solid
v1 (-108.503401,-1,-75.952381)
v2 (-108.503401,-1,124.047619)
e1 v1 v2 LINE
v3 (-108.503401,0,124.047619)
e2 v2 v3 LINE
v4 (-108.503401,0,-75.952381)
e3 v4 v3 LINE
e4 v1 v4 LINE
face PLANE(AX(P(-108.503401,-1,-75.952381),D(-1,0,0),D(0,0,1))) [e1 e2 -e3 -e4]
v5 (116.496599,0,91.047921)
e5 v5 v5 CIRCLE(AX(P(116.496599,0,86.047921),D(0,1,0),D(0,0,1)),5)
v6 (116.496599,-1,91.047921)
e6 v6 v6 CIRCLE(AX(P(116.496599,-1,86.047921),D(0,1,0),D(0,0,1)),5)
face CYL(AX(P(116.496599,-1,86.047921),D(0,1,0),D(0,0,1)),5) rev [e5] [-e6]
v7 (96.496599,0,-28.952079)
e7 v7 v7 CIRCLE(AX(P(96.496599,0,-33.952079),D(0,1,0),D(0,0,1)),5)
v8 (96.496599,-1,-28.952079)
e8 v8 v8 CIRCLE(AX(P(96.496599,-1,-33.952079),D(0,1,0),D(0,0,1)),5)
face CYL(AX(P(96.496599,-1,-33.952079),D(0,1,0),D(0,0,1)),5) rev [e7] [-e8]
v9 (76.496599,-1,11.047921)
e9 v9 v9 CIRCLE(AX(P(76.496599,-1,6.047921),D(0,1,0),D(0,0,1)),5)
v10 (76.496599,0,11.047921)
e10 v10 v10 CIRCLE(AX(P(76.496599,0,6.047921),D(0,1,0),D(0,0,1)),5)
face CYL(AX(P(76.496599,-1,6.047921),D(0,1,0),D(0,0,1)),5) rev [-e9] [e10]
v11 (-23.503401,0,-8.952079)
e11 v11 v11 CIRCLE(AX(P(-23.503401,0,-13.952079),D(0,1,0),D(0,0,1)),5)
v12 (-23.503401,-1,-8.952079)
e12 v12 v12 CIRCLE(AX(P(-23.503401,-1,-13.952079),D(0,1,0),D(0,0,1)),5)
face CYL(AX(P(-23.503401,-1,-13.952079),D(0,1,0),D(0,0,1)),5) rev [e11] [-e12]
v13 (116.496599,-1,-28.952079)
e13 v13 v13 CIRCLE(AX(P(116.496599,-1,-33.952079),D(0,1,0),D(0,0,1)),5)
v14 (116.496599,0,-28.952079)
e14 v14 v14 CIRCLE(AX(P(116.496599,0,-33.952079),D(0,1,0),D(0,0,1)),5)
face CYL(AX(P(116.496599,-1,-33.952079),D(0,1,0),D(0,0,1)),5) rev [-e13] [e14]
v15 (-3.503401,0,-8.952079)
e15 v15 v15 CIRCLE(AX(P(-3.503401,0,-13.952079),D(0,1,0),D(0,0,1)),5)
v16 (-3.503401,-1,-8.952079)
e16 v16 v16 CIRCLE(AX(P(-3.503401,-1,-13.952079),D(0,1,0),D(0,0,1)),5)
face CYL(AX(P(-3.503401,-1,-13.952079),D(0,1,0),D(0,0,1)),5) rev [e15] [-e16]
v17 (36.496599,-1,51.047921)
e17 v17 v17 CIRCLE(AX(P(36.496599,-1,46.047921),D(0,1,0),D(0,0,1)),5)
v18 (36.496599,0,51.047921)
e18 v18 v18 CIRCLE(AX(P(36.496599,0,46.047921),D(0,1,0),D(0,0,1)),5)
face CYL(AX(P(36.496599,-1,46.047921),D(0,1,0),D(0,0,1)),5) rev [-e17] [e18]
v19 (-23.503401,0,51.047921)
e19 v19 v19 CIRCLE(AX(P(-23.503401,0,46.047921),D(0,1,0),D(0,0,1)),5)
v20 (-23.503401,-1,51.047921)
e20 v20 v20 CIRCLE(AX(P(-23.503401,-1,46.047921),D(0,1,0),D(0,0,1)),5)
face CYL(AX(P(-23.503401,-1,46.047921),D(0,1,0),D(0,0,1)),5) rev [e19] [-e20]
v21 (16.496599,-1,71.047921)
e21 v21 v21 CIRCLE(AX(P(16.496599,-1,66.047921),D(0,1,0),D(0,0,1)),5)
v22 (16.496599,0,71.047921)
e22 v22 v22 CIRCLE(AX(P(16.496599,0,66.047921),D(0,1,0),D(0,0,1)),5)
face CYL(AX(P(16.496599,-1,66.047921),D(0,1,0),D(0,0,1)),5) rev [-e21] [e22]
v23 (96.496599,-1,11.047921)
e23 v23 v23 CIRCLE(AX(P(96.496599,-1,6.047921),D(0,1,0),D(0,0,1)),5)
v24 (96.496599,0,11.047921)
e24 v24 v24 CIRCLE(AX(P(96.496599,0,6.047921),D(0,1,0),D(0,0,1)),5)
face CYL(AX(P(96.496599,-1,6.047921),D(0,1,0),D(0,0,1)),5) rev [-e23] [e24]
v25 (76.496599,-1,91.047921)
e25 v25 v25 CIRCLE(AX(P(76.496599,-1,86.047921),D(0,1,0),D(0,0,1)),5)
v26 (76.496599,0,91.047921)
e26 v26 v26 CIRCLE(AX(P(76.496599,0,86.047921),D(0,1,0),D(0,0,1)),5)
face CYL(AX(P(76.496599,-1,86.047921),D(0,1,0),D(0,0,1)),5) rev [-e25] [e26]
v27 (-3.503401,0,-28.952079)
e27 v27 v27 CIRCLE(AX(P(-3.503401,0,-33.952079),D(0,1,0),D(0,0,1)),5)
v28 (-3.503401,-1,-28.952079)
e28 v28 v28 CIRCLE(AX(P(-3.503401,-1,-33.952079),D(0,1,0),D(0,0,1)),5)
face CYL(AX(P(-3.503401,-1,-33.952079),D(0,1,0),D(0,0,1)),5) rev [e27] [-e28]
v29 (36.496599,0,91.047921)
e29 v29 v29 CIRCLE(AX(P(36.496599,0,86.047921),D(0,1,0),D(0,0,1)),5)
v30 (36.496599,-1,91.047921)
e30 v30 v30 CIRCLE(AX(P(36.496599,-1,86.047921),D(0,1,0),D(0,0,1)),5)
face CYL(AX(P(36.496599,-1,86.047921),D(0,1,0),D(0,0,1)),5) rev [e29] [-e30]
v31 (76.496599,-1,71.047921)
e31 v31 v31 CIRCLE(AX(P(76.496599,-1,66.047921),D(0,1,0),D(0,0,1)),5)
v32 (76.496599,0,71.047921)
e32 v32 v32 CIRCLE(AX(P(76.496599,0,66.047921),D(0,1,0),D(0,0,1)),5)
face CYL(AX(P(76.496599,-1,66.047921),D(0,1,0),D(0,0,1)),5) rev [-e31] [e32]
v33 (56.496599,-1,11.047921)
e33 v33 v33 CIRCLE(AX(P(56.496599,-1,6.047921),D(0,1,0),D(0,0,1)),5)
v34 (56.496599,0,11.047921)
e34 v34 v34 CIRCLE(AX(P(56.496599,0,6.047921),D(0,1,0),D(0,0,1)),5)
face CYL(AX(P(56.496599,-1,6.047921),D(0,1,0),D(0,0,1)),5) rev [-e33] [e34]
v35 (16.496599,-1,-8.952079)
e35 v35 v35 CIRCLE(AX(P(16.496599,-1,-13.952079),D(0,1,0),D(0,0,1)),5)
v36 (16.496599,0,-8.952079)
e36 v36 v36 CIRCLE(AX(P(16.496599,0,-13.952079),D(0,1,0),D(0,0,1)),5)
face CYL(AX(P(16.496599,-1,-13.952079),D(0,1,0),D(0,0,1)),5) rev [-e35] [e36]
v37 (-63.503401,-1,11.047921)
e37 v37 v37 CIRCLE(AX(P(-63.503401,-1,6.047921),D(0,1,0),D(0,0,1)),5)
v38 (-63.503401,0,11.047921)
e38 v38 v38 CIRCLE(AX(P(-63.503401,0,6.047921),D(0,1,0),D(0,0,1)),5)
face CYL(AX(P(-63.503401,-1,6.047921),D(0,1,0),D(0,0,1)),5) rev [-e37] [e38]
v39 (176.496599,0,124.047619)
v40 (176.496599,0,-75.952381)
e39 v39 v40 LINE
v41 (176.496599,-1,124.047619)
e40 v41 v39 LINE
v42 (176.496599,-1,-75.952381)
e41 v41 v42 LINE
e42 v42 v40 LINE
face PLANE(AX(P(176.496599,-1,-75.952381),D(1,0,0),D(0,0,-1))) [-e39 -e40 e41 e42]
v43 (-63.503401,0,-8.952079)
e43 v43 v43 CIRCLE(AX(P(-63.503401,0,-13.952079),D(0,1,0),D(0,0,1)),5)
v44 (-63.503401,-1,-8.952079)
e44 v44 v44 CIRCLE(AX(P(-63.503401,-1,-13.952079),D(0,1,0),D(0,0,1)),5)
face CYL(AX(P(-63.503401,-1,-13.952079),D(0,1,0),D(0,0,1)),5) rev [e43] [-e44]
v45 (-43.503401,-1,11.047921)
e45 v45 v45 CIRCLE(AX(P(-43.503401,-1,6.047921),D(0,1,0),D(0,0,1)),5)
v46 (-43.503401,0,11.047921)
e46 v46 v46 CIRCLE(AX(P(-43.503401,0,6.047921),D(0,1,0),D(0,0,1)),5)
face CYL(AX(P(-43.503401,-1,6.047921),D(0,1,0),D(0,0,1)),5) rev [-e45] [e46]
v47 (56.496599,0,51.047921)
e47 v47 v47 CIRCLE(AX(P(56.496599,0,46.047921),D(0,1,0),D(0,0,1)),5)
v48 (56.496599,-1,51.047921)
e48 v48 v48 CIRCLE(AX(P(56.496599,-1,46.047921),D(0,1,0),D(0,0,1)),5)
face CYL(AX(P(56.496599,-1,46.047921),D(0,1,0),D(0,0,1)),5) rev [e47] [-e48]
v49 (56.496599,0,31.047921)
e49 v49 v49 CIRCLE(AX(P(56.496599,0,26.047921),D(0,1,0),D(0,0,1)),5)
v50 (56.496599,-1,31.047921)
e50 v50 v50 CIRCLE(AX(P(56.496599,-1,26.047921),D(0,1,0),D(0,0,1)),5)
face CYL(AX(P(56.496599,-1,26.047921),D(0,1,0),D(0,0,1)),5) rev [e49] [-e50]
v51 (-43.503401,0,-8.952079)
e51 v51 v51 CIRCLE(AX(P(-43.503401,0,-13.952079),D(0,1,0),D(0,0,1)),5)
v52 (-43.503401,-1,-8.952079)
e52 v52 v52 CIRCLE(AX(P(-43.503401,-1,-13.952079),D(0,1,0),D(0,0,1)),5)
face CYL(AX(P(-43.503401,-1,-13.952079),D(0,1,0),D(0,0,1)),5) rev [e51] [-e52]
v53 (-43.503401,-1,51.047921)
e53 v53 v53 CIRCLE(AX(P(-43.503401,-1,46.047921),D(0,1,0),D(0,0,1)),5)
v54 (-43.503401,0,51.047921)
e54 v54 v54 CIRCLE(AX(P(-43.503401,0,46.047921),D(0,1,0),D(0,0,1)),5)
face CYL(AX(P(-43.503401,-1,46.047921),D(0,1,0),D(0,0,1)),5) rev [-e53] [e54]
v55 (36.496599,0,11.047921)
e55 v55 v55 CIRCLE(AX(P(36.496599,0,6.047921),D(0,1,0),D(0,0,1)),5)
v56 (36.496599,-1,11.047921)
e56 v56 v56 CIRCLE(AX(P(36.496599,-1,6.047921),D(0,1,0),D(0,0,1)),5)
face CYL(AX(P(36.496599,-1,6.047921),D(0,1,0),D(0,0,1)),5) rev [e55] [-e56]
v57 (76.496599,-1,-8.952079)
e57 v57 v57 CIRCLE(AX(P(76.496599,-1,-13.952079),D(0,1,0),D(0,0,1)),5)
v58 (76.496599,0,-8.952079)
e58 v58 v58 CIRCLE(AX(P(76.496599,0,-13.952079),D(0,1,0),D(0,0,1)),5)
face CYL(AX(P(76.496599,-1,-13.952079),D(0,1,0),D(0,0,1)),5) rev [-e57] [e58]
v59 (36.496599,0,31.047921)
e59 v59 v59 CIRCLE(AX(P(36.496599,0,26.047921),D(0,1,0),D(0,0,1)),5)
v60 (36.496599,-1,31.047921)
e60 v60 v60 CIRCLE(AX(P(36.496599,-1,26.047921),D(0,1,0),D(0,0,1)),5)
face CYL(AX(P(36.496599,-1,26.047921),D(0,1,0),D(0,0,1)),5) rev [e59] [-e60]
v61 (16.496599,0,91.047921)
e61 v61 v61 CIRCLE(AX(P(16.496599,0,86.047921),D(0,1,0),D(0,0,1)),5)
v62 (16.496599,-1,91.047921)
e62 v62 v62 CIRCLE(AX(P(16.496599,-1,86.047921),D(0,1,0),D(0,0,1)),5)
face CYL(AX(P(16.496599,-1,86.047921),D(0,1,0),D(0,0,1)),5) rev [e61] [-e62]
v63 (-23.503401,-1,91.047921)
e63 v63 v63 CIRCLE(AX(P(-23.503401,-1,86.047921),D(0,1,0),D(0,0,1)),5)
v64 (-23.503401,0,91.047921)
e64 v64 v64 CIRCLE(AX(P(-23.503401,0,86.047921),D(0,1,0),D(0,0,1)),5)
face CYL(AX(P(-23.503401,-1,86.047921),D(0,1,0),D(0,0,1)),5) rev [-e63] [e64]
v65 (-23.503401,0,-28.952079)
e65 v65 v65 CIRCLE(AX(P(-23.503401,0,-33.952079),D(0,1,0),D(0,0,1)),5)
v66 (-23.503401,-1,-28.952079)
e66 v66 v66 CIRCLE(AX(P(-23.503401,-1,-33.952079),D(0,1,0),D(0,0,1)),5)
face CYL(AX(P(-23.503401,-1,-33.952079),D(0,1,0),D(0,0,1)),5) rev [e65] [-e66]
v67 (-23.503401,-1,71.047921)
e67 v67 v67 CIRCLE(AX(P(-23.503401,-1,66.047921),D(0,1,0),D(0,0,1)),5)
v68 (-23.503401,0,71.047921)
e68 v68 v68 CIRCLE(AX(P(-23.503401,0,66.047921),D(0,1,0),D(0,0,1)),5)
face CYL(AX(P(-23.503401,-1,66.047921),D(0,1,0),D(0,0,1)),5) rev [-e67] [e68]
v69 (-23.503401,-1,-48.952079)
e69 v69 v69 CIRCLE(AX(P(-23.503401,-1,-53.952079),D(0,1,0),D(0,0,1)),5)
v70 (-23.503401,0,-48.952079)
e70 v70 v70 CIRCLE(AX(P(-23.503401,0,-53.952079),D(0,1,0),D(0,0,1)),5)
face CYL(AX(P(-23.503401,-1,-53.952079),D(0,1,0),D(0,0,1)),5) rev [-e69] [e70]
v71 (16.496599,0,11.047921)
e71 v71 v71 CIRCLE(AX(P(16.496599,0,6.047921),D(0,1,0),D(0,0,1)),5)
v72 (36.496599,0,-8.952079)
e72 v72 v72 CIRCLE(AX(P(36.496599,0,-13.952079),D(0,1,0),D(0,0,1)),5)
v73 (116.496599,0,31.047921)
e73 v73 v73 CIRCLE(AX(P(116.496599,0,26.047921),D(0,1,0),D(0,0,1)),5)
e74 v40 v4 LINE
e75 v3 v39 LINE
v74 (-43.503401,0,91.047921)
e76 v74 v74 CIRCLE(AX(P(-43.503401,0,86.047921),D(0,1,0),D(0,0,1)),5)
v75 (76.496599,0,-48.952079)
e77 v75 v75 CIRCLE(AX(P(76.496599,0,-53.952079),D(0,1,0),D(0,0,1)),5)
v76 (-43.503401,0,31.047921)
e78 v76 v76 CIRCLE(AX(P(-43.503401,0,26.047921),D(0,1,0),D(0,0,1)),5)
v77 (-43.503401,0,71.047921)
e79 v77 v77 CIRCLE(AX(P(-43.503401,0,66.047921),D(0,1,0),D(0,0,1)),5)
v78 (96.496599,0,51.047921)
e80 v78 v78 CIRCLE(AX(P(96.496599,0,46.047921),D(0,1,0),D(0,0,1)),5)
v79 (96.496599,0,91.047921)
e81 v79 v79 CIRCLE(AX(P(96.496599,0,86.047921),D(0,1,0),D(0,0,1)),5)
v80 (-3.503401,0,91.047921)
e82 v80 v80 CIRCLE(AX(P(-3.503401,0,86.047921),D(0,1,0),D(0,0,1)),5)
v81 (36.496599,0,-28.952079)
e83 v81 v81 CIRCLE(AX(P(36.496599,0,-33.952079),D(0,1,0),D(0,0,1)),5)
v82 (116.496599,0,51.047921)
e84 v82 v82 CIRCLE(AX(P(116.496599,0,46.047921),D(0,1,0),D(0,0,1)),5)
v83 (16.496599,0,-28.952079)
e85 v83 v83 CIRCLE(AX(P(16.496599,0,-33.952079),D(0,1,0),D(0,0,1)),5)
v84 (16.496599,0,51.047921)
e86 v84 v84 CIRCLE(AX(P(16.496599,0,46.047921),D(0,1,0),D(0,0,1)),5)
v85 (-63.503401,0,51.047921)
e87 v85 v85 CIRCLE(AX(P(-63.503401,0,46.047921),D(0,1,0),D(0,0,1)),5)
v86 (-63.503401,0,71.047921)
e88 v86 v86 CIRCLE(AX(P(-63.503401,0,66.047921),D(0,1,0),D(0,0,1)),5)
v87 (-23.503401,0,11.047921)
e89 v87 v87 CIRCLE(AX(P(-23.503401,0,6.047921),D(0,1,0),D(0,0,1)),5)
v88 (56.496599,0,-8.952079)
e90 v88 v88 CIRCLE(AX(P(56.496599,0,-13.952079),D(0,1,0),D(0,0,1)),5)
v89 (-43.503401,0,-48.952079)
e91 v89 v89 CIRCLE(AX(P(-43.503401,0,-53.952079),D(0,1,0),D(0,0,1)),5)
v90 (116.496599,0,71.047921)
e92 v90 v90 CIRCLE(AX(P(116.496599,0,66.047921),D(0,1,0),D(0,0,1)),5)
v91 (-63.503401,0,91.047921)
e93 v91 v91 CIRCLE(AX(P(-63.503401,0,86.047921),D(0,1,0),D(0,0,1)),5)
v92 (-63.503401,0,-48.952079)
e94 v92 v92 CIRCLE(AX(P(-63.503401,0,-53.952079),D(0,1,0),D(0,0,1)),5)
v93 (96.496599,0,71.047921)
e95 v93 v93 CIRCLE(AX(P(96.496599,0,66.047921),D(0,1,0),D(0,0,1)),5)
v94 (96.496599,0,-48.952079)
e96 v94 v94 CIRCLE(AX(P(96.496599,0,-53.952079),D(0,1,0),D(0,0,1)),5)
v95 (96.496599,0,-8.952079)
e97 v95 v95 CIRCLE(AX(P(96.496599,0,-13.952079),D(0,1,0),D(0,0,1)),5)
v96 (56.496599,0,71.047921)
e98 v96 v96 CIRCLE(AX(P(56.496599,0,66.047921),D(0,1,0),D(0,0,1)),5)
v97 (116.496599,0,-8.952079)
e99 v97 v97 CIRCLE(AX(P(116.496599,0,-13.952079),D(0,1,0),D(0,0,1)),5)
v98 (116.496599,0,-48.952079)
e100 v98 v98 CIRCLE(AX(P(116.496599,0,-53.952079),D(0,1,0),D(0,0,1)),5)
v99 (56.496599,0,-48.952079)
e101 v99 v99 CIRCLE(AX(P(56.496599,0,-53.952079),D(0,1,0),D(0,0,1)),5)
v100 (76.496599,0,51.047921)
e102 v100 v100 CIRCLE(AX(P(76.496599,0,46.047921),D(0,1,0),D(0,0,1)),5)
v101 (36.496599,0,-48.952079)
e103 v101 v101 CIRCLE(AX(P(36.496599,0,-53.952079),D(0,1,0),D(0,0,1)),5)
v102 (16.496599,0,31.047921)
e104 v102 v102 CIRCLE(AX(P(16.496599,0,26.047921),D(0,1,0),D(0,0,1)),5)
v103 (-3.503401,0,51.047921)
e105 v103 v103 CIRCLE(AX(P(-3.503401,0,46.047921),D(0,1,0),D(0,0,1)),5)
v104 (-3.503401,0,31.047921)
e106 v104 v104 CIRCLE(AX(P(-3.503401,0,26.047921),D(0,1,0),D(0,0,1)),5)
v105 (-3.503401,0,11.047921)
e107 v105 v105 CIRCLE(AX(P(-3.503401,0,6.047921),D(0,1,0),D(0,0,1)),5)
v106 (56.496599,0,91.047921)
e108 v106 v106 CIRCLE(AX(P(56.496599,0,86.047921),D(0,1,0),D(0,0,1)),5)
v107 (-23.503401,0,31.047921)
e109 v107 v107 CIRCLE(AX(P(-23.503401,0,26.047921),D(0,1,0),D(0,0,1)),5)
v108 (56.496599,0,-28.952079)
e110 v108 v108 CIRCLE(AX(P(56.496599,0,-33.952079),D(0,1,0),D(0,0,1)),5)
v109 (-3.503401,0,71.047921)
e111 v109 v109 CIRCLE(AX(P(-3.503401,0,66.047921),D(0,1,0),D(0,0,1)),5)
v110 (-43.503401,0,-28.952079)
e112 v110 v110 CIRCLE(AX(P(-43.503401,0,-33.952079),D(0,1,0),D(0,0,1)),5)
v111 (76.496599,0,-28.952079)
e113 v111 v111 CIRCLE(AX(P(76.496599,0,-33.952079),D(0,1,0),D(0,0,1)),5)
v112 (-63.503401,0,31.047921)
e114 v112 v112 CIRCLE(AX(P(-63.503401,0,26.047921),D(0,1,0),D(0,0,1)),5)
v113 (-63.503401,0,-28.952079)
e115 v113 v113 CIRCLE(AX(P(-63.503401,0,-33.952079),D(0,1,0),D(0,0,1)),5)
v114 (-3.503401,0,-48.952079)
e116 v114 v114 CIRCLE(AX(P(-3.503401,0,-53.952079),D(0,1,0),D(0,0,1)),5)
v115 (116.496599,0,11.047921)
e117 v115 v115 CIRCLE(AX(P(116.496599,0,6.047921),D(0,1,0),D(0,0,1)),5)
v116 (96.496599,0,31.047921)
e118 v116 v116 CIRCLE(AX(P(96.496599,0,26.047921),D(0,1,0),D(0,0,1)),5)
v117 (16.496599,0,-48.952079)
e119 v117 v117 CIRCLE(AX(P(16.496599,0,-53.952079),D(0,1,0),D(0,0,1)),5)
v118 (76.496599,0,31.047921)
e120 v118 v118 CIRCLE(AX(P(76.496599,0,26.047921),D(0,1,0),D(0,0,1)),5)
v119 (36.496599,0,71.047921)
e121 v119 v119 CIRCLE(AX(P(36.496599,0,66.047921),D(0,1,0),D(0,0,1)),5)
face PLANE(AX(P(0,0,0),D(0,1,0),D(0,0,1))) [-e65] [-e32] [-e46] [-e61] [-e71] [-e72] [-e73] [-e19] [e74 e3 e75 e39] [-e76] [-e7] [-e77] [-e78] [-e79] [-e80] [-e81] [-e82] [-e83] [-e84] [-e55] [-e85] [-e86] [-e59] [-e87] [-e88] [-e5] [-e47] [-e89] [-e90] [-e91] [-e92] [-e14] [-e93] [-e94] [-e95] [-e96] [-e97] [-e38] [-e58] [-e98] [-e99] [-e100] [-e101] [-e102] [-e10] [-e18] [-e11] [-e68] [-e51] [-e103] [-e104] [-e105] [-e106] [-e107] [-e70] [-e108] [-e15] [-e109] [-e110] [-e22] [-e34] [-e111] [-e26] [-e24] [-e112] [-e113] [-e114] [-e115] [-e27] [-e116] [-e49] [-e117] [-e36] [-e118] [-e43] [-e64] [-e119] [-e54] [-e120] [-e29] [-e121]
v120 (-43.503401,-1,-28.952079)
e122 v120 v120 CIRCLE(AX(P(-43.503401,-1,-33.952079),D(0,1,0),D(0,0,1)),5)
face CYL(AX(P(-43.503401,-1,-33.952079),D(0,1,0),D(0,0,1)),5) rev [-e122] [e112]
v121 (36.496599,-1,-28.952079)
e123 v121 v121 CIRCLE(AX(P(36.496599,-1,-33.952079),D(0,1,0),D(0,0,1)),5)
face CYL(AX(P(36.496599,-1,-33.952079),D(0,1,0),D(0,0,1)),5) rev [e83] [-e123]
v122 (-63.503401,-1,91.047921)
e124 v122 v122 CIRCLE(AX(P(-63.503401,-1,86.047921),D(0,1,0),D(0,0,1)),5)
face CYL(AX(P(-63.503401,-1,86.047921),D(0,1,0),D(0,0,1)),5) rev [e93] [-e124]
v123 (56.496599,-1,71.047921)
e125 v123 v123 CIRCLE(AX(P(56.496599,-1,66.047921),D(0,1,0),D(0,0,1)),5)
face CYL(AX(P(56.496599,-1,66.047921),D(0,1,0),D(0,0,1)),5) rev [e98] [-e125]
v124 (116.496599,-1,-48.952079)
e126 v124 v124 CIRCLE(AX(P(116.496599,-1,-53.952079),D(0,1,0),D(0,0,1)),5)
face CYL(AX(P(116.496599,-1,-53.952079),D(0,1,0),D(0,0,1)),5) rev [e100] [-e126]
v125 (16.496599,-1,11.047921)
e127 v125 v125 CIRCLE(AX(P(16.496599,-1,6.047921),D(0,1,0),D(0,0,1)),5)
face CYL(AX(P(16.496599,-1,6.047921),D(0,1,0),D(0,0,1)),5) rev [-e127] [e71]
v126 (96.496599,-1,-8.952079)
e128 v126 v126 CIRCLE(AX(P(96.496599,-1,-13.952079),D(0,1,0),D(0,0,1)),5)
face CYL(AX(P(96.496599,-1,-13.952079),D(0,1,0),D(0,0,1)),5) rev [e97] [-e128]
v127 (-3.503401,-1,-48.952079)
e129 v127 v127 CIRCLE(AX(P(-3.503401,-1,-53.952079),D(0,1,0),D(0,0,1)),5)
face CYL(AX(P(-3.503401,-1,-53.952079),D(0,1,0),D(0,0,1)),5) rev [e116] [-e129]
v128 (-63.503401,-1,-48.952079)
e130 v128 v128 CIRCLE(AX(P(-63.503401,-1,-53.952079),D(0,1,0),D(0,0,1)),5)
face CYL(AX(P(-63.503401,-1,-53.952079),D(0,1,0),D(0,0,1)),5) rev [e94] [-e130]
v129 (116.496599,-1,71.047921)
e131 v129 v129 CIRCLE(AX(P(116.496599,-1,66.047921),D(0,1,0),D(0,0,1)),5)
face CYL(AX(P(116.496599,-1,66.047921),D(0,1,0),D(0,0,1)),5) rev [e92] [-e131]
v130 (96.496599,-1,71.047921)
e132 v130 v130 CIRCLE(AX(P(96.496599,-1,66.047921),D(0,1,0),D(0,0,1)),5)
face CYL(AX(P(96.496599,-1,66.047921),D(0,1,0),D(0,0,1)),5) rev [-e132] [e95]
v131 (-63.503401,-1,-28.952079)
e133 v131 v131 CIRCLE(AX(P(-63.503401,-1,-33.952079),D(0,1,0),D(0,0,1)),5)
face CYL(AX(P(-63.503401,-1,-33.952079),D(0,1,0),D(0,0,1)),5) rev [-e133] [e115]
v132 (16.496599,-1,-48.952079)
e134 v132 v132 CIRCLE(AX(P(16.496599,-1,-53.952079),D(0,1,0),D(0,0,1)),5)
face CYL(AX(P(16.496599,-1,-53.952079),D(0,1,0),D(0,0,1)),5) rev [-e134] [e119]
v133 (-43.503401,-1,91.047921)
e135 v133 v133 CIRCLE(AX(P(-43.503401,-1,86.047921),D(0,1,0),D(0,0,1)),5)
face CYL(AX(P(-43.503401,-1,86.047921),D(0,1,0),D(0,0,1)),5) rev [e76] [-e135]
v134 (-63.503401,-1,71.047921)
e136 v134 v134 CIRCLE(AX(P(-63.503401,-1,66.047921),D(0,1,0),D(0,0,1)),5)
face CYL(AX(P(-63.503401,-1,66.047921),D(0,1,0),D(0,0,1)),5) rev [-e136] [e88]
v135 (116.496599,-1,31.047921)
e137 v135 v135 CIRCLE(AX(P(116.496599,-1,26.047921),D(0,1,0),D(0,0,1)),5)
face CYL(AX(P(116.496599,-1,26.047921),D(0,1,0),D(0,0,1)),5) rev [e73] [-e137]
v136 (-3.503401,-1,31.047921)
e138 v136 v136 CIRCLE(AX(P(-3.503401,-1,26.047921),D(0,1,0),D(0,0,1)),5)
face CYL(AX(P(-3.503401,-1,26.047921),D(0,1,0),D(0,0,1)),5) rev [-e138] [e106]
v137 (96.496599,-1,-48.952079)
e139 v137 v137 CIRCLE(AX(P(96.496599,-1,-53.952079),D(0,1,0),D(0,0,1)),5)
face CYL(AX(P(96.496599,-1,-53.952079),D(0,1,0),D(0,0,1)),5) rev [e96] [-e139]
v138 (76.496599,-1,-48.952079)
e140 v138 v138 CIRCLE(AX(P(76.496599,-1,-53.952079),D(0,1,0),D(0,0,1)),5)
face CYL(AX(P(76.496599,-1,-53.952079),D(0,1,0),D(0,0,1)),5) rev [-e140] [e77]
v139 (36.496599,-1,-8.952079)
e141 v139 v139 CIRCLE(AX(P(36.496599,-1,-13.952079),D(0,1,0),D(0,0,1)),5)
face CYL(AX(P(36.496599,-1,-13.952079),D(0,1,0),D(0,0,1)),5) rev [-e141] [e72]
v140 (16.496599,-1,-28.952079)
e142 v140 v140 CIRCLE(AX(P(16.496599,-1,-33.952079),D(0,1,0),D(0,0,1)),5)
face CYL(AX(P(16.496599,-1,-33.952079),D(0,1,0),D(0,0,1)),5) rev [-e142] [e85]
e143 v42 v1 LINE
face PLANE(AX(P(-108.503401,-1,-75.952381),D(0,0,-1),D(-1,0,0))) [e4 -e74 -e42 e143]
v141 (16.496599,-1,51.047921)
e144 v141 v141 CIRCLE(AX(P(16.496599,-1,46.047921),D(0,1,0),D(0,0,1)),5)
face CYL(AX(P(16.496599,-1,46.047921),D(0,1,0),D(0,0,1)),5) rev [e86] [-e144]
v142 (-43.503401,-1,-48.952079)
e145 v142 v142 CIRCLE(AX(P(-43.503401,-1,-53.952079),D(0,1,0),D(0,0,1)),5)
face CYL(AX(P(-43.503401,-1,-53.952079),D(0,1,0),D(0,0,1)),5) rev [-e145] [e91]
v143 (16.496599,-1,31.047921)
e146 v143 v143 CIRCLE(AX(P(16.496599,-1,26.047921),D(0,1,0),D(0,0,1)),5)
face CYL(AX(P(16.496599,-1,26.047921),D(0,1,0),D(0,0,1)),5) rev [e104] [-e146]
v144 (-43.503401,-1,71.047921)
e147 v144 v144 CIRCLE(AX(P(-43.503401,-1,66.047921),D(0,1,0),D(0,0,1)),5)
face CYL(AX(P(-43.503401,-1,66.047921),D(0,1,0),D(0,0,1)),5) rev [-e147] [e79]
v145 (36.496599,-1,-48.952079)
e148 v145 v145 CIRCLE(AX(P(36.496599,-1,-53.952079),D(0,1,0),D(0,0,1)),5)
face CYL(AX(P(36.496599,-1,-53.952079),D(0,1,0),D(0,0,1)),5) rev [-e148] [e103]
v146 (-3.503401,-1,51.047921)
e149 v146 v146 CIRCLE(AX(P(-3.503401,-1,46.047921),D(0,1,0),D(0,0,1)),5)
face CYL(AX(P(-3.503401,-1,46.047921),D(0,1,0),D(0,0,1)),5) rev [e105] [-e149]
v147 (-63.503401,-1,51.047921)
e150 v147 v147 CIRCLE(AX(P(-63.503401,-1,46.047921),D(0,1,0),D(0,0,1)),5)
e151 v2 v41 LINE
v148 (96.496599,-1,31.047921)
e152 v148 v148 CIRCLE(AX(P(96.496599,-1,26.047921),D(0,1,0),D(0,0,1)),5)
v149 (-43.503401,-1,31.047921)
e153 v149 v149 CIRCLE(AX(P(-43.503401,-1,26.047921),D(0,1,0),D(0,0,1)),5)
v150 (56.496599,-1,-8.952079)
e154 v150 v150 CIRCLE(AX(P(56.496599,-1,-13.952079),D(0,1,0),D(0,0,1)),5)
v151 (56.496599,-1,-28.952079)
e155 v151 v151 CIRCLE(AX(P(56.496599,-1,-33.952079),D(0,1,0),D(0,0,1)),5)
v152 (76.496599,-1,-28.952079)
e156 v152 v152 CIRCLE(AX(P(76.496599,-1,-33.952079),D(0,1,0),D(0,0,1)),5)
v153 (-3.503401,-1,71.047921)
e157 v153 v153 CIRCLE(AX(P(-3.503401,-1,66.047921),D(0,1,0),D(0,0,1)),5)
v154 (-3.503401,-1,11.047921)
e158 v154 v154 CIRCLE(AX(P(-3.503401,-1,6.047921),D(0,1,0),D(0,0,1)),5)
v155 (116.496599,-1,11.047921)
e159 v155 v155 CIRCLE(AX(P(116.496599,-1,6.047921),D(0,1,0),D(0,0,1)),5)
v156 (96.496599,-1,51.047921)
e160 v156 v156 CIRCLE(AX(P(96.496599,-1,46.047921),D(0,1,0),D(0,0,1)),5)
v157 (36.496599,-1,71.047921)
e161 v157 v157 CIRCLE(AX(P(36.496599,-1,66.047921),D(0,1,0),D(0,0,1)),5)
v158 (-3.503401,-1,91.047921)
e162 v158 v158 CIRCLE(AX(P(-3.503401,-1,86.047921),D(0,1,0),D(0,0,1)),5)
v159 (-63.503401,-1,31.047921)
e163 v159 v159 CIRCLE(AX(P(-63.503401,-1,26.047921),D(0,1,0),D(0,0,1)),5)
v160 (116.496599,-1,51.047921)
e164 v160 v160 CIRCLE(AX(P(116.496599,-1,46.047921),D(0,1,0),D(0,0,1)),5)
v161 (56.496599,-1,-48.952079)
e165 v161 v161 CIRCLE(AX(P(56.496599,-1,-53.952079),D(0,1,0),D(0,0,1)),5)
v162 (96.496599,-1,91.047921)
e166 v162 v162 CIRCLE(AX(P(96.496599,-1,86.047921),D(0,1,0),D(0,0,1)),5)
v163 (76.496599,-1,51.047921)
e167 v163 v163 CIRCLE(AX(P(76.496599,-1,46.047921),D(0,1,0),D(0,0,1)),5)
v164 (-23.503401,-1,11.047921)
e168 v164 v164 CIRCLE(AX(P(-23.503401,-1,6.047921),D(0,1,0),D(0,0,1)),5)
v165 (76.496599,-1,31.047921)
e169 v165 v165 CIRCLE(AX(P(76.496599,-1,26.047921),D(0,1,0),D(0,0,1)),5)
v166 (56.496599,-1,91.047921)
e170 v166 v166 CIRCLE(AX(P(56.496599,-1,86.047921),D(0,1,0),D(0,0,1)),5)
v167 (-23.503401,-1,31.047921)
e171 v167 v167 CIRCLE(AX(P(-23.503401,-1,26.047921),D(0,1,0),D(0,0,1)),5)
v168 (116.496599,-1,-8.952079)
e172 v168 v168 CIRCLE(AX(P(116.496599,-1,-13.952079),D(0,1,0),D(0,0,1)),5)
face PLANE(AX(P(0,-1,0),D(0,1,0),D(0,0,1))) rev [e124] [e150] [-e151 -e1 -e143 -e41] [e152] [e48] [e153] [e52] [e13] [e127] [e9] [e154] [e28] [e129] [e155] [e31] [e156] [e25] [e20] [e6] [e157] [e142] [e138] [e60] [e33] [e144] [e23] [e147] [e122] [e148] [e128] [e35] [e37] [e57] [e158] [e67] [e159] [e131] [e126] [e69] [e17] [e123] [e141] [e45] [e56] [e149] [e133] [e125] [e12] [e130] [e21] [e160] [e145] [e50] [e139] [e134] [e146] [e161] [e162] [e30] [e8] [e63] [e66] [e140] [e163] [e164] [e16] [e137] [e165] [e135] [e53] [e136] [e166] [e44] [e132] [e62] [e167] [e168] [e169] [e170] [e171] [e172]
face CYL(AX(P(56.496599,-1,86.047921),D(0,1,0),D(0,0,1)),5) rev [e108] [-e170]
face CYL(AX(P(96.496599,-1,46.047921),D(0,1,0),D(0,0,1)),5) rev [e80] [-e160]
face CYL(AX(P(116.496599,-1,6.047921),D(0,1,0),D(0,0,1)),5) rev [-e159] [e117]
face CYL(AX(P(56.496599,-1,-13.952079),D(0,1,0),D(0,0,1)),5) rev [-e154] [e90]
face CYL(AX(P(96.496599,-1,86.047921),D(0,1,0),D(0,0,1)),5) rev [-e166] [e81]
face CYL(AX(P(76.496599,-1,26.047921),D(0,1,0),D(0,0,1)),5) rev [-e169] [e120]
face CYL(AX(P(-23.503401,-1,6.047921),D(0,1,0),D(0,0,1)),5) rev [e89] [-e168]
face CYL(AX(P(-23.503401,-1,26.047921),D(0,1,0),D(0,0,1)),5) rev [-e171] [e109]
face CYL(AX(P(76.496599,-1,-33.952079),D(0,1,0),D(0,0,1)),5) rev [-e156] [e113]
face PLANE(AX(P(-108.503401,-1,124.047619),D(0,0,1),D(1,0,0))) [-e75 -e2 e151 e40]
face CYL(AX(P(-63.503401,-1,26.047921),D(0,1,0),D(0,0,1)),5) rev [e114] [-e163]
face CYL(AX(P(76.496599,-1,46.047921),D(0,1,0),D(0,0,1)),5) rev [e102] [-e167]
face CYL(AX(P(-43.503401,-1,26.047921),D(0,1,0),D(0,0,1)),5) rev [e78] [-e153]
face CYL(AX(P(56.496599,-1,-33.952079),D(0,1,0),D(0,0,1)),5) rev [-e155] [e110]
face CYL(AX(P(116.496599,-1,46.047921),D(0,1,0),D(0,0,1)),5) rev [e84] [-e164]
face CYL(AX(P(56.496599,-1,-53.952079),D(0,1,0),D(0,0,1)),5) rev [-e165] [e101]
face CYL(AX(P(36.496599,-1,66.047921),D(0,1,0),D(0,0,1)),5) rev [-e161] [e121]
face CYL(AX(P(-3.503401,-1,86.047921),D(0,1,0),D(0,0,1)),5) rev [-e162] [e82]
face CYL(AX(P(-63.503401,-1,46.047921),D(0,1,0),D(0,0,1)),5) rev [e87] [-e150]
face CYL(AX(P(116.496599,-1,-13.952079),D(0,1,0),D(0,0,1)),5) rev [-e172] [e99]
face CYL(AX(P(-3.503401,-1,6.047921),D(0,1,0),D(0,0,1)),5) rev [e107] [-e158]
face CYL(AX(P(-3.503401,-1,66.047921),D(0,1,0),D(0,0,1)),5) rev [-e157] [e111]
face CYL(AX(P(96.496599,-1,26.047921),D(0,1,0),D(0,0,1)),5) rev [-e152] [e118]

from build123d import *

# Parameters (mm, degrees)
SKETCH1_W          = 285
SKETCH1_H          = 200
BASE_FLANGE1_DEPTH = 1
SKETCH2_R          = 5
CUT_EXTRUDE1_DEPTH = 216.730992495


# Sheet-metal steps are written as plain solids
with BuildPart() as part:
    # Sketch1 → Base-Flange1 (new body)
    with BuildSketch(Plane(origin=(0, 0, 0), x_dir=(1, 0, 0), z_dir=(0, 1, 0))):
        with Locations((33.996598639, -24.047619048)):
            Rectangle(SKETCH1_W, SKETCH1_H)
    extrude(amount=-BASE_FLANGE1_DEPTH)

    # Sketch2 → Cut-Extrude1 (cut, through all)
    with BuildSketch(Plane(origin=(0, 0, 0), x_dir=(1, 0, 0), z_dir=(0, 1, 0))):
        with Locations(Location((-63.503401361, 53.952079096, 0), (0, 0, 270))):
            Circle(SKETCH2_R)
        with Locations(Location((-63.503401361, 33.952079096, 0), (0, 0, 270))):
            Circle(SKETCH2_R)
        with Locations(Location((-63.503401361, 13.952079096, 0), (0, 0, 270))):
            Circle(SKETCH2_R)
        with Locations(Location((-63.503401361, -6.047920904, 0), (0, 0, 270))):
            Circle(SKETCH2_R)
        with Locations(Location((-63.503401361, -26.047920904, 0), (0, 0, 270))):
            Circle(SKETCH2_R)
        with Locations(Location((-63.503401361, -46.047920904, 0), (0, 0, 270))):
            Circle(SKETCH2_R)
        with Locations(Location((-63.503401361, -66.047920904, 0), (0, 0, 270))):
            Circle(SKETCH2_R)
        with Locations(Location((-63.503401361, -86.047920904, 0), (0, 0, 270))):
            Circle(SKETCH2_R)
        with Locations(Location((-43.503401361, 53.952079096, 0), (0, 0, 270))):
            Circle(SKETCH2_R)
        with Locations(Location((-43.503401361, 33.952079096, 0), (0, 0, 270))):
            Circle(SKETCH2_R)
        with Locations(Location((-43.503401361, 13.952079096, 0), (0, 0, 270))):
            Circle(SKETCH2_R)
        with Locations(Location((-43.503401361, -6.047920904, 0), (0, 0, 270))):
            Circle(SKETCH2_R)
        with Locations(Location((-43.503401361, -26.047920904, 0), (0, 0, 270))):
            Circle(SKETCH2_R)
        with Locations(Location((-43.503401361, -46.047920904, 0), (0, 0, 270))):
            Circle(SKETCH2_R)
        with Locations(Location((-43.503401361, -66.047920904, 0), (0, 0, 270))):
            Circle(SKETCH2_R)
        with Locations(Location((-43.503401361, -86.047920904, 0), (0, 0, 270))):
            Circle(SKETCH2_R)
        with Locations(Location((-23.503401361, 53.952079096, 0), (0, 0, 270))):
            Circle(SKETCH2_R)
        with Locations(Location((-23.503401361, 33.952079096, 0), (0, 0, 270))):
            Circle(SKETCH2_R)
        with Locations(Location((-23.503401361, 13.952079096, 0), (0, 0, 270))):
            Circle(SKETCH2_R)
        with Locations(Location((-23.503401361, -6.047920904, 0), (0, 0, 270))):
            Circle(SKETCH2_R)
        with Locations(Location((-23.503401361, -26.047920904, 0), (0, 0, 270))):
            Circle(SKETCH2_R)
        with Locations(Location((-23.503401361, -46.047920904, 0), (0, 0, 270))):
            Circle(SKETCH2_R)
        with Locations(Location((-23.503401361, -66.047920904, 0), (0, 0, 270))):
            Circle(SKETCH2_R)
        with Locations(Location((-23.503401361, -86.047920904, 0), (0, 0, 270))):
            Circle(SKETCH2_R)
        with Locations(Location((-3.503401361, 53.952079096, 0), (0, 0, 270))):
            Circle(SKETCH2_R)
        with Locations(Location((-3.503401361, 33.952079096, 0), (0, 0, 270))):
            Circle(SKETCH2_R)
        with Locations(Location((-3.503401361, 13.952079096, 0), (0, 0, 270))):
            Circle(SKETCH2_R)
        with Locations(Location((-3.503401361, -6.047920904, 0), (0, 0, 270))):
            Circle(SKETCH2_R)
        with Locations(Location((-3.503401361, -26.047920904, 0), (0, 0, 270))):
            Circle(SKETCH2_R)
        with Locations(Location((-3.503401361, -46.047920904, 0), (0, 0, 270))):
            Circle(SKETCH2_R)
        with Locations(Location((-3.503401361, -66.047920904, 0), (0, 0, 270))):
            Circle(SKETCH2_R)
        with Locations(Location((-3.503401361, -86.047920904, 0), (0, 0, 270))):
            Circle(SKETCH2_R)
        with Locations(Location((16.496598639, 53.952079096, 0), (0, 0, 270))):
            Circle(SKETCH2_R)
        with Locations(Location((16.496598639, 33.952079096, 0), (0, 0, 270))):
            Circle(SKETCH2_R)
        with Locations(Location((16.496598639, 13.952079096, 0), (0, 0, 270))):
            Circle(SKETCH2_R)
        with Locations(Location((16.496598639, -6.047920904, 0), (0, 0, 270))):
            Circle(SKETCH2_R)
        with Locations(Location((16.496598639, -26.047920904, 0), (0, 0, 270))):
            Circle(SKETCH2_R)
        with Locations(Location((16.496598639, -46.047920904, 0), (0, 0, 270))):
            Circle(SKETCH2_R)
        with Locations(Location((16.496598639, -66.047920904, 0), (0, 0, 270))):
            Circle(SKETCH2_R)
        with Locations(Location((16.496598639, -86.047920904, 0), (0, 0, 270))):
            Circle(SKETCH2_R)
        with Locations(Location((36.496598639, 53.952079096, 0), (0, 0, 270))):
            Circle(SKETCH2_R)
        with Locations(Location((36.496598639, 33.952079096, 0), (0, 0, 270))):
            Circle(SKETCH2_R)
        with Locations(Location((36.496598639, 13.952079096, 0), (0, 0, 270))):
            Circle(SKETCH2_R)
        with Locations(Location((36.496598639, -6.047920904, 0), (0, 0, 270))):
            Circle(SKETCH2_R)
        with Locations(Location((36.496598639, -26.047920904, 0), (0, 0, 270))):
            Circle(SKETCH2_R)
        with Locations(Location((36.496598639, -46.047920904, 0), (0, 0, 270))):
            Circle(SKETCH2_R)
        with Locations(Location((36.496598639, -66.047920904, 0), (0, 0, 270))):
            Circle(SKETCH2_R)
        with Locations(Location((36.496598639, -86.047920904, 0), (0, 0, 270))):
            Circle(SKETCH2_R)
        with Locations(Location((56.496598639, 53.952079096, 0), (0, 0, 270))):
            Circle(SKETCH2_R)
        with Locations(Location((56.496598639, 33.952079096, 0), (0, 0, 270))):
            Circle(SKETCH2_R)
        with Locations(Location((56.496598639, 13.952079096, 0), (0, 0, 270))):
            Circle(SKETCH2_R)
        with Locations(Location((56.496598639, -6.047920904, 0), (0, 0, 270))):
            Circle(SKETCH2_R)
        with Locations(Location((56.496598639, -26.047920904, 0), (0, 0, 270))):
            Circle(SKETCH2_R)
        with Locations(Location((56.496598639, -46.047920904, 0), (0, 0, 270))):
            Circle(SKETCH2_R)
        with Locations(Location((56.496598639, -66.047920904, 0), (0, 0, 270))):
            Circle(SKETCH2_R)
        with Locations(Location((56.496598639, -86.047920904, 0), (0, 0, 270))):
            Circle(SKETCH2_R)
        with Locations(Location((76.496598639, 53.952079096, 0), (0, 0, 270))):
            Circle(SKETCH2_R)
        with Locations(Location((76.496598639, 33.952079096, 0), (0, 0, 270))):
            Circle(SKETCH2_R)
        with Locations(Location((76.496598639, 13.952079096, 0), (0, 0, 270))):
            Circle(SKETCH2_R)
        with Locations(Location((76.496598639, -6.047920904, 0), (0, 0, 270))):
            Circle(SKETCH2_R)
        with Locations(Location((76.496598639, -26.047920904, 0), (0, 0, 270))):
            Circle(SKETCH2_R)
        with Locations(Location((76.496598639, -46.047920904, 0), (0, 0, 270))):
            Circle(SKETCH2_R)
        with Locations(Location((76.496598639, -66.047920904, 0), (0, 0, 270))):
            Circle(SKETCH2_R)
        with Locations(Location((76.496598639, -86.047920904, 0), (0, 0, 270))):
            Circle(SKETCH2_R)
        with Locations(Location((96.496598639, 53.952079096, 0), (0, 0, 270))):
            Circle(SKETCH2_R)
        with Locations(Location((96.496598639, 33.952079096, 0), (0, 0, 270))):
            Circle(SKETCH2_R)
        with Locations(Location((96.496598639, 13.952079096, 0), (0, 0, 270))):
            Circle(SKETCH2_R)
        with Locations(Location((96.496598639, -6.047920904, 0), (0, 0, 270))):
            Circle(SKETCH2_R)
        with Locations(Location((96.496598639, -26.047920904, 0), (0, 0, 270))):
            Circle(SKETCH2_R)
        with Locations(Location((96.496598639, -46.047920904, 0), (0, 0, 270))):
            Circle(SKETCH2_R)
        with Locations(Location((96.496598639, -66.047920904, 0), (0, 0, 270))):
            Circle(SKETCH2_R)
        with Locations(Location((96.496598639, -86.047920904, 0), (0, 0, 270))):
            Circle(SKETCH2_R)
        with Locations(Location((116.496598639, 53.952079096, 0), (0, 0, 270))):
            Circle(SKETCH2_R)
        with Locations(Location((116.496598639, 33.952079096, 0), (0, 0, 270))):
            Circle(SKETCH2_R)
        with Locations(Location((116.496598639, 13.952079096, 0), (0, 0, 270))):
            Circle(SKETCH2_R)
        with Locations(Location((116.496598639, -6.047920904, 0), (0, 0, 270))):
            Circle(SKETCH2_R)
        with Locations(Location((116.496598639, -26.047920904, 0), (0, 0, 270))):
            Circle(SKETCH2_R)
        with Locations(Location((116.496598639, -46.047920904, 0), (0, 0, 270))):
            Circle(SKETCH2_R)
        with Locations(Location((116.496598639, -66.047920904, 0), (0, 0, 270))):
            Circle(SKETCH2_R)
        with Locations(Location((116.496598639, -86.047920904, 0), (0, 0, 270))):
            Circle(SKETCH2_R)
    extrude(amount=-CUT_EXTRUDE1_DEPTH, mode=Mode.SUBTRACT)


solid = part.part
